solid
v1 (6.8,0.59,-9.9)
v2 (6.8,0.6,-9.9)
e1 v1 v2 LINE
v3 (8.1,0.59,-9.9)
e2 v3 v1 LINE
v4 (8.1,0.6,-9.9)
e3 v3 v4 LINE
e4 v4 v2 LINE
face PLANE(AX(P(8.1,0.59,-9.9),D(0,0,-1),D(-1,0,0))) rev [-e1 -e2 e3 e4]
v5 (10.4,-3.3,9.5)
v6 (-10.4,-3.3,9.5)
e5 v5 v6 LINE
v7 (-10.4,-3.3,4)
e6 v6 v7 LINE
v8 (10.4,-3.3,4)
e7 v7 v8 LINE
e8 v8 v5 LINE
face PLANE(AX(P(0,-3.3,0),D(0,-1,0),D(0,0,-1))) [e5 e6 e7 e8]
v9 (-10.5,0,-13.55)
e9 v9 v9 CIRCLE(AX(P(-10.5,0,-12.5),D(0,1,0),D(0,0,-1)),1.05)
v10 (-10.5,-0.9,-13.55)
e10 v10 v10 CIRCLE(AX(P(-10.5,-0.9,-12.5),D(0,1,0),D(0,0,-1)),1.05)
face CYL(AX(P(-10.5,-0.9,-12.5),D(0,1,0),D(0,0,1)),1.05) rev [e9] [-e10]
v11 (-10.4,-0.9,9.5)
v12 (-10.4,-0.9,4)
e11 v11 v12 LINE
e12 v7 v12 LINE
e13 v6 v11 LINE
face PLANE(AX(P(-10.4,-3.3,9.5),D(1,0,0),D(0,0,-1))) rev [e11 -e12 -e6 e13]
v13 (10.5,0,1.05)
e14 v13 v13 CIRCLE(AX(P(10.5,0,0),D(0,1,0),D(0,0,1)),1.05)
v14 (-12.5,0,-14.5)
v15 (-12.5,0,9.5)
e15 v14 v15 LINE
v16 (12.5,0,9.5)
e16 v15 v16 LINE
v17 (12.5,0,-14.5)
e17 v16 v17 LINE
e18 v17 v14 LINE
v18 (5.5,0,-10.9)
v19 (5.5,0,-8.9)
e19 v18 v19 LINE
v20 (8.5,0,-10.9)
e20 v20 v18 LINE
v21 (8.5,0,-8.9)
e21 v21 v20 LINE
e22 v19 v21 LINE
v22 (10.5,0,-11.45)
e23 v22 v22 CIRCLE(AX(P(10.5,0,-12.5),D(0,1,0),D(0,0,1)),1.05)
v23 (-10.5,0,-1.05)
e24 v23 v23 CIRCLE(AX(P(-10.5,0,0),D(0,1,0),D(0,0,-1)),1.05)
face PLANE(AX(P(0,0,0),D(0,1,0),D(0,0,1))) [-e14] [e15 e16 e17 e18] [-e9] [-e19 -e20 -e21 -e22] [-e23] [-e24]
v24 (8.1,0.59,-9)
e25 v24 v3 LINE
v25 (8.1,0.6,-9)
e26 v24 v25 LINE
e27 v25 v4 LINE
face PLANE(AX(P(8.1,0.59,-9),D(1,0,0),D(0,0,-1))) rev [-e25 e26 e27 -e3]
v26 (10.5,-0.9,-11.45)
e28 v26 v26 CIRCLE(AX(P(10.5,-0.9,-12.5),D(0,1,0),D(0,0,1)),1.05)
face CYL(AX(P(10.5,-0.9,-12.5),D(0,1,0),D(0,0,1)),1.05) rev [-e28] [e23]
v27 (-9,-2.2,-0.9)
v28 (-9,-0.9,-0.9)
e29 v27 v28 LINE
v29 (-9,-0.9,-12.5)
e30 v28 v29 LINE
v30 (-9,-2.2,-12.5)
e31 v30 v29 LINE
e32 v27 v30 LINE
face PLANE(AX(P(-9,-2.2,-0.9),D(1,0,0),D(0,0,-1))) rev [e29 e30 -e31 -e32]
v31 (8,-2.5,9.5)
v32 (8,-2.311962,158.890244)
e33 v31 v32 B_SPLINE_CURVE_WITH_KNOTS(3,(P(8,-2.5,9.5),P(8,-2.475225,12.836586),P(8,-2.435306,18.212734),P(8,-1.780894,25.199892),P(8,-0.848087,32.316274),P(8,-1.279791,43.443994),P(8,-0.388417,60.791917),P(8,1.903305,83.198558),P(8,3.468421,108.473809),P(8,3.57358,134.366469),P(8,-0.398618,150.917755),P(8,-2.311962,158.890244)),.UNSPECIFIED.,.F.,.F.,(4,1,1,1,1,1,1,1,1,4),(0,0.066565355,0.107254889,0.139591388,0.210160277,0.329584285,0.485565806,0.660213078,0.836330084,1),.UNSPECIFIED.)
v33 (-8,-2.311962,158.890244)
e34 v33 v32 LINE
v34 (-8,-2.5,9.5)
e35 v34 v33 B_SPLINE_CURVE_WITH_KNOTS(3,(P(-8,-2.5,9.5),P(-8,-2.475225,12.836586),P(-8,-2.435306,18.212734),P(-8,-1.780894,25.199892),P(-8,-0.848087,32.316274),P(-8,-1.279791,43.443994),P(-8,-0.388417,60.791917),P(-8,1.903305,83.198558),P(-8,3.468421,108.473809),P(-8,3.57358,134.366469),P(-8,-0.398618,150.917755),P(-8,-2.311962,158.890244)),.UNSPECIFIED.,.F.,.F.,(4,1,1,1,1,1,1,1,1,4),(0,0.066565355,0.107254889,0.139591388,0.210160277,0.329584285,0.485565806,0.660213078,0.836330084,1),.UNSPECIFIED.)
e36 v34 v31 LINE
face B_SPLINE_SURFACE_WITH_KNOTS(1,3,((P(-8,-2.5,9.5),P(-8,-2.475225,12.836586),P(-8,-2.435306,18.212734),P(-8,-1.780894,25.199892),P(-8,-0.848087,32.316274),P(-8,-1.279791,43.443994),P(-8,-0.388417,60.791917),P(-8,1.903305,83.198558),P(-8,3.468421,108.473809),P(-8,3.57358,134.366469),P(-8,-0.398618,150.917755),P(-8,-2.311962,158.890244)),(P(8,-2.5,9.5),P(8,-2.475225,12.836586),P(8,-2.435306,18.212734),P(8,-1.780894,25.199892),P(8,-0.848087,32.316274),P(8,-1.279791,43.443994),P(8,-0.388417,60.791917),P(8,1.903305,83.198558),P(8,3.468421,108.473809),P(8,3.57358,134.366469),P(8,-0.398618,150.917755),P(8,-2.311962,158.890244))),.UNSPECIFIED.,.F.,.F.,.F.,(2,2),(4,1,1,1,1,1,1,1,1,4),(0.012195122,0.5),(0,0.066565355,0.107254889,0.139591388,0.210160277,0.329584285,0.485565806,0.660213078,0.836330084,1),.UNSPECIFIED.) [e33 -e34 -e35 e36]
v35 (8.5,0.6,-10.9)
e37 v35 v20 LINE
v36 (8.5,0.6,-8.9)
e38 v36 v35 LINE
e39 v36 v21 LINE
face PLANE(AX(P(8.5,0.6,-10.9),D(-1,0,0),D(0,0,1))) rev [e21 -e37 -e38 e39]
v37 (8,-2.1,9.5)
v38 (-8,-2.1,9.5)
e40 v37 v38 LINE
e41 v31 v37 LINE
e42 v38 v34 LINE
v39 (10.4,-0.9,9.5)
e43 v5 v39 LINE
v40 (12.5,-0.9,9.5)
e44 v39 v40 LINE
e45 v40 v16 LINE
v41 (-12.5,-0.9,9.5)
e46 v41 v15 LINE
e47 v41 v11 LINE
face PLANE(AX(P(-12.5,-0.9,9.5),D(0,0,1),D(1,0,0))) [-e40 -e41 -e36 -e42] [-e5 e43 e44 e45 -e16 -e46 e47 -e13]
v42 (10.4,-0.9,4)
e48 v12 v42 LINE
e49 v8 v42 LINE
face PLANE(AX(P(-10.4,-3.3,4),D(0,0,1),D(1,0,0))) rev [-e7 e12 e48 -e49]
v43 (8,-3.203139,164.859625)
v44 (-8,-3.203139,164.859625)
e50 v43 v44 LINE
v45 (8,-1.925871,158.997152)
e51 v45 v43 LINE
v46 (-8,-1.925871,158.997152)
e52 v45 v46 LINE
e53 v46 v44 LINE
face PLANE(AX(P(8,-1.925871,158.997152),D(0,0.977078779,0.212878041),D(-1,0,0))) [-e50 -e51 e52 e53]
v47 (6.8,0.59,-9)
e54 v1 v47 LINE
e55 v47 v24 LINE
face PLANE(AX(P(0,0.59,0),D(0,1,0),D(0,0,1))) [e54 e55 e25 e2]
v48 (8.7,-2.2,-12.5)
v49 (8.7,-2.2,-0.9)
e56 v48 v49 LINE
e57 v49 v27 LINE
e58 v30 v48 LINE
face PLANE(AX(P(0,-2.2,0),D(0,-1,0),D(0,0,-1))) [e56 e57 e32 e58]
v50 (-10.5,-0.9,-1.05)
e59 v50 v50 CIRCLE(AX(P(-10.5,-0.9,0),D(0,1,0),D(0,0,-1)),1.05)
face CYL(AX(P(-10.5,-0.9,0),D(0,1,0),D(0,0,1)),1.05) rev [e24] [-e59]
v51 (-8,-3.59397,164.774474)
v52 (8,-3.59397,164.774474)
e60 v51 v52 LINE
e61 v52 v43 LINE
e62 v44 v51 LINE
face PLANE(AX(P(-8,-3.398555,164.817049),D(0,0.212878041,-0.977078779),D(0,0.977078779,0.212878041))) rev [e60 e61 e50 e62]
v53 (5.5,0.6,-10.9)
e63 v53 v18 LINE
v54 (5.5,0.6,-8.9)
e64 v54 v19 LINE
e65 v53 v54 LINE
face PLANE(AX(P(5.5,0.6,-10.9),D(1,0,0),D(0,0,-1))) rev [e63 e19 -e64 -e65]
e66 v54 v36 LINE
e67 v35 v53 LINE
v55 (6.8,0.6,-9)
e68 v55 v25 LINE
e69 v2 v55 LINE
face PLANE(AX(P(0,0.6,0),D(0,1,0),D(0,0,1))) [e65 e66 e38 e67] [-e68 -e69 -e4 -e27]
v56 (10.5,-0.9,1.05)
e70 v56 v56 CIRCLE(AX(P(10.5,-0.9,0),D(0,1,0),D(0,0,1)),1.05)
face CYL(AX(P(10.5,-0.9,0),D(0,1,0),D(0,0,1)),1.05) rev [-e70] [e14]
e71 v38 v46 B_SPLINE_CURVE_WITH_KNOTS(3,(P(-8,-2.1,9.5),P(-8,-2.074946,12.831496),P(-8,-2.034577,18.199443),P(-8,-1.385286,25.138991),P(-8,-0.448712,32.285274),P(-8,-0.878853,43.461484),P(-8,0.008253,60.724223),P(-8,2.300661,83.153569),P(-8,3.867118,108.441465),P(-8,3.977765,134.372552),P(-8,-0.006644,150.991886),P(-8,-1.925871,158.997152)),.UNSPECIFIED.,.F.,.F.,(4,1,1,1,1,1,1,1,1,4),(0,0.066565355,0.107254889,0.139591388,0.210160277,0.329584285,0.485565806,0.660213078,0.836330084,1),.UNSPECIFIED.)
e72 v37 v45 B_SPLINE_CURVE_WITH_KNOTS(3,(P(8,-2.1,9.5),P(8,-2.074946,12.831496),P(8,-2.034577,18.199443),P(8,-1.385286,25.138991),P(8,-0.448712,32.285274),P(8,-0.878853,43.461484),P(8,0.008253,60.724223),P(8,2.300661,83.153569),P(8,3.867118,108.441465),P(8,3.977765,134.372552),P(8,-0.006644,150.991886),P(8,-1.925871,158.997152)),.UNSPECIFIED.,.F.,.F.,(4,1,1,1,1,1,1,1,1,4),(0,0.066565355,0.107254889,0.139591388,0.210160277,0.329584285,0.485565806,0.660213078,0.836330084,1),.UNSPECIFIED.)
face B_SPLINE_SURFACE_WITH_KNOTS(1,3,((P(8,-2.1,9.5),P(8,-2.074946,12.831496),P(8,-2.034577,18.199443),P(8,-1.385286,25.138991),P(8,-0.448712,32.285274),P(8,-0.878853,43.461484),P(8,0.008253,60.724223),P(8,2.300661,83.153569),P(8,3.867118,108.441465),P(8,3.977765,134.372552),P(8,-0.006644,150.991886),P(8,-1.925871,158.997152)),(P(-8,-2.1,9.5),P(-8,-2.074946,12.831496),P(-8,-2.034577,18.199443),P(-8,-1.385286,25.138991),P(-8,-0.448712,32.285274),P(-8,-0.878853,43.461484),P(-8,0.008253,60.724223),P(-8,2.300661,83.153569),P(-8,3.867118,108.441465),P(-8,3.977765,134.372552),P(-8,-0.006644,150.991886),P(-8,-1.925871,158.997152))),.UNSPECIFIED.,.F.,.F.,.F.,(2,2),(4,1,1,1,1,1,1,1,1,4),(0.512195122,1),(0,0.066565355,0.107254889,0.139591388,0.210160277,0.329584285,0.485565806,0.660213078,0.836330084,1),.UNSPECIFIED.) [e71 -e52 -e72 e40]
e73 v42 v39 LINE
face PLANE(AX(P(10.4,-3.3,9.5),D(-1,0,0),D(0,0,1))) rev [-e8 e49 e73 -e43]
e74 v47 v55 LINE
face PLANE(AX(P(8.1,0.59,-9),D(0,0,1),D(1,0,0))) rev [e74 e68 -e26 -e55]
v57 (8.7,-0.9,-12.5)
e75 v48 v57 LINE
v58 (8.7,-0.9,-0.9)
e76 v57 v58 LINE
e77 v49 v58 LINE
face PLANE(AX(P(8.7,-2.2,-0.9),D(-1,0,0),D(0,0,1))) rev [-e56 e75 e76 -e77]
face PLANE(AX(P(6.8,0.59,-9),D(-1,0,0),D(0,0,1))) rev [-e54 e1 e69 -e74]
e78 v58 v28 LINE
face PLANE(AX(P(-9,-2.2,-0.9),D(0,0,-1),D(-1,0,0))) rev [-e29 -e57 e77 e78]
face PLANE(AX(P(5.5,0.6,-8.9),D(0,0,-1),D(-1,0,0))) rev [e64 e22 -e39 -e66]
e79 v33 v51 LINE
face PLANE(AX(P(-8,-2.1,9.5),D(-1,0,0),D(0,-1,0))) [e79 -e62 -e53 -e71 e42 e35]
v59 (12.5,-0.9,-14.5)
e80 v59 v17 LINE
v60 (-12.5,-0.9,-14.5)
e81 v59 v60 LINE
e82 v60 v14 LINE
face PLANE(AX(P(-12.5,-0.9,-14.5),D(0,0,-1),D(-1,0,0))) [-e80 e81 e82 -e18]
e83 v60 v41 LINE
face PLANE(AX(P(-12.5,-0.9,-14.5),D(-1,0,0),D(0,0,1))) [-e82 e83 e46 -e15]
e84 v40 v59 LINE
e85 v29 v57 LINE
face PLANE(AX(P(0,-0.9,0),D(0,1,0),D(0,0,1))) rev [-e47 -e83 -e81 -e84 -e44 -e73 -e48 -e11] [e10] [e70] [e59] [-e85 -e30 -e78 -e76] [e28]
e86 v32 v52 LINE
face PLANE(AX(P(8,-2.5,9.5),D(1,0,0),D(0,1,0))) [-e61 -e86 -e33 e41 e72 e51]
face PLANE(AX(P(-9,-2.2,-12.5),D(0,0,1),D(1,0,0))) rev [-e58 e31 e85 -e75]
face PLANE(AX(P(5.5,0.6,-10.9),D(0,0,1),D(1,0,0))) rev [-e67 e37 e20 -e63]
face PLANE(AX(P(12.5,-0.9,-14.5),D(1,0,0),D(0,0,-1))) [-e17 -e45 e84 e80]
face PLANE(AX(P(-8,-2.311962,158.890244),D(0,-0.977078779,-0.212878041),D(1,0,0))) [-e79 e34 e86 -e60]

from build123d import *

# Parameters (mm, degrees)
SKIZZE1_W                                 = 25
SKIZZE1_H                                 = 24
PCB_DEPTH                                 = 0.9
SKIZZE2_R                                 = 1.05
MOUNTING_HOLES_DEPTH                      = 20.165333287
SKIZZE3_W                                 = 20.8
SKIZZE3_H                                 = 5.5
CONNECTOR_CLOSED_DEPTH                    = 2.4
SKIZZE4_W                                 = 17.7
SKIZZE4_H                                 = 11.6
COMPONENTS_WORST_CASE_BOUNDARY_BOX_DEPTH  = 1.3
CABLE_156MM_FREE_LENGTH_START             = -8
CABLE_156MM_FREE_LENGTH_DEPTH             = 16
SKIZZE7_W                                 = 3
SKIZZE7_H                                 = 2
COMPONENTS_WORST_CASE_BOUNDARY_BOX2_DEPTH = 0.6
SKIZZE8_W                                 = 1.3
SKIZZE8_H                                 = 0.9
STATUS_LED_DEPTH                          = 0.01


# Read off the part's stored shape, not the designer's step: Cable_156mm_free_Length
with BuildPart() as part:
    # Skizze1 → PCB (new body)
    with BuildSketch(Plane(origin=(0, 0, 0), x_dir=(1, 0, 0), z_dir=(0, 1, 0))):
        with Locations((0, 2.5)):
            Rectangle(SKIZZE1_W, SKIZZE1_H)
    extrude(amount=-PCB_DEPTH)

    # Skizze2 → Mounting_Holes (cut, through all)
    with BuildSketch(Plane(origin=(0, 0, 0), x_dir=(1, 0, 0), z_dir=(0, 1, 0))):
        with Locations(Location((10.5, 12.5, 0), (0, 0, 270))):
            Circle(SKIZZE2_R)
        with Locations(Location((10.5, 0, 0), (0, 0, 270))):
            Circle(SKIZZE2_R)
        with Locations(Location((-10.5, 0, 0), (0, 0, 90))):
            Circle(SKIZZE2_R)
        with Locations(Location((-10.5, 12.5, 0), (0, 0, 90))):
            Circle(SKIZZE2_R)
    extrude(amount=-MOUNTING_HOLES_DEPTH, mode=Mode.SUBTRACT)

    # Skizze3 → Connector_closed (add)
    with BuildSketch(Plane.XZ.offset(0.9)):
        with Locations((0, 6.75)):
            Rectangle(SKIZZE3_W, SKIZZE3_H)
    extrude(amount=CONNECTOR_CLOSED_DEPTH)

    # Skizze4 → Components_worst-case_Boundary-Box (add)
    with BuildSketch(Plane.XZ.offset(0.9)):
        with Locations((-0.15, -6.7)):
            Rectangle(SKIZZE4_W, SKIZZE4_H)
    extrude(amount=COMPONENTS_WORST_CASE_BOUNDARY_BOX_DEPTH)

    # Cable_156mm_free_Length outline → Cable_156mm_free_Length (add)
    with BuildSketch(Plane.YZ.offset(CABLE_156MM_FREE_LENGTH_START)):
        with BuildLine():
            add(Edge.make_bspline(
                [(-2.5, 9.5), (-2.475225113, 12.836586164), (-2.435306032, 18.21273383), (-1.780893788, 25.199891819), (-0.848086938, 32.316273634), (-1.279790623, 43.443994082), (-0.388416893, 60.791916601), (1.903305425, 83.198557796), (3.468421225, 108.473808964), (3.57358047, 134.366469325), (-0.398617572, 150.91775474), (-2.311961718, 158.890243708)],
                knots=[0, 0, 0, 0, 0.066565355, 0.107254889, 0.139591388, 0.210160277, 0.329584285, 0.485565806, 0.660213078, 0.836330084, 1, 1, 1, 1], degree=3))
            Line((-2.5, 9.5), (-2.1, 9.5))
            add(Edge.make_bspline(
                [(-2.1, 9.5), (-2.074945976, 12.831496447), (-2.03457713, 18.199443194), (-1.385285743, 25.13899131), (-0.448711873, 32.285274364), (-0.878853095, 43.46148369), (0.008252641, 60.724222754), (2.300661353, 83.153569069), (3.867117874, 108.441464768), (3.977764902, 134.372552415), (-0.006644422, 150.991885803), (-1.925870548, 158.99715239)],
                knots=[0, 0, 0, 0, 0.066565355, 0.107254889, 0.139591388, 0.210160277, 0.329584285, 0.485565806, 0.660213078, 0.836330084, 1, 1, 1, 1], degree=3))
            Line((-1.925870548, 158.99715239), (-3.203138794, 164.859625062))
            Line((-3.203138794, 164.859625062), (-3.593970306, 164.774473846))
            Line((-3.593970306, 164.774473846), (-2.311961718, 158.890243708))
        make_face()
    extrude(amount=CABLE_156MM_FREE_LENGTH_DEPTH)

    # Skizze7 → Components_worst-case_Boundary-Box2 (add)
    with BuildSketch(Plane(origin=(0, 0, 0), x_dir=(1, 0, 0), z_dir=(0, 1, 0))):
        with Locations((7, 9.9)):
            Rectangle(SKIZZE7_W, SKIZZE7_H)
    extrude(amount=COMPONENTS_WORST_CASE_BOUNDARY_BOX2_DEPTH)

    # Skizze8 → Status_LED (cut)
    with BuildSketch(Plane(origin=(0, 0.6, 0), x_dir=(1, 0, 0), z_dir=(0, 1, 0))):
        with Locations((7.45, 9.45)):
            Rectangle(SKIZZE8_W, SKIZZE8_H)
    extrude(amount=-STATUS_LED_DEPTH, mode=Mode.SUBTRACT)


solid = part.part
